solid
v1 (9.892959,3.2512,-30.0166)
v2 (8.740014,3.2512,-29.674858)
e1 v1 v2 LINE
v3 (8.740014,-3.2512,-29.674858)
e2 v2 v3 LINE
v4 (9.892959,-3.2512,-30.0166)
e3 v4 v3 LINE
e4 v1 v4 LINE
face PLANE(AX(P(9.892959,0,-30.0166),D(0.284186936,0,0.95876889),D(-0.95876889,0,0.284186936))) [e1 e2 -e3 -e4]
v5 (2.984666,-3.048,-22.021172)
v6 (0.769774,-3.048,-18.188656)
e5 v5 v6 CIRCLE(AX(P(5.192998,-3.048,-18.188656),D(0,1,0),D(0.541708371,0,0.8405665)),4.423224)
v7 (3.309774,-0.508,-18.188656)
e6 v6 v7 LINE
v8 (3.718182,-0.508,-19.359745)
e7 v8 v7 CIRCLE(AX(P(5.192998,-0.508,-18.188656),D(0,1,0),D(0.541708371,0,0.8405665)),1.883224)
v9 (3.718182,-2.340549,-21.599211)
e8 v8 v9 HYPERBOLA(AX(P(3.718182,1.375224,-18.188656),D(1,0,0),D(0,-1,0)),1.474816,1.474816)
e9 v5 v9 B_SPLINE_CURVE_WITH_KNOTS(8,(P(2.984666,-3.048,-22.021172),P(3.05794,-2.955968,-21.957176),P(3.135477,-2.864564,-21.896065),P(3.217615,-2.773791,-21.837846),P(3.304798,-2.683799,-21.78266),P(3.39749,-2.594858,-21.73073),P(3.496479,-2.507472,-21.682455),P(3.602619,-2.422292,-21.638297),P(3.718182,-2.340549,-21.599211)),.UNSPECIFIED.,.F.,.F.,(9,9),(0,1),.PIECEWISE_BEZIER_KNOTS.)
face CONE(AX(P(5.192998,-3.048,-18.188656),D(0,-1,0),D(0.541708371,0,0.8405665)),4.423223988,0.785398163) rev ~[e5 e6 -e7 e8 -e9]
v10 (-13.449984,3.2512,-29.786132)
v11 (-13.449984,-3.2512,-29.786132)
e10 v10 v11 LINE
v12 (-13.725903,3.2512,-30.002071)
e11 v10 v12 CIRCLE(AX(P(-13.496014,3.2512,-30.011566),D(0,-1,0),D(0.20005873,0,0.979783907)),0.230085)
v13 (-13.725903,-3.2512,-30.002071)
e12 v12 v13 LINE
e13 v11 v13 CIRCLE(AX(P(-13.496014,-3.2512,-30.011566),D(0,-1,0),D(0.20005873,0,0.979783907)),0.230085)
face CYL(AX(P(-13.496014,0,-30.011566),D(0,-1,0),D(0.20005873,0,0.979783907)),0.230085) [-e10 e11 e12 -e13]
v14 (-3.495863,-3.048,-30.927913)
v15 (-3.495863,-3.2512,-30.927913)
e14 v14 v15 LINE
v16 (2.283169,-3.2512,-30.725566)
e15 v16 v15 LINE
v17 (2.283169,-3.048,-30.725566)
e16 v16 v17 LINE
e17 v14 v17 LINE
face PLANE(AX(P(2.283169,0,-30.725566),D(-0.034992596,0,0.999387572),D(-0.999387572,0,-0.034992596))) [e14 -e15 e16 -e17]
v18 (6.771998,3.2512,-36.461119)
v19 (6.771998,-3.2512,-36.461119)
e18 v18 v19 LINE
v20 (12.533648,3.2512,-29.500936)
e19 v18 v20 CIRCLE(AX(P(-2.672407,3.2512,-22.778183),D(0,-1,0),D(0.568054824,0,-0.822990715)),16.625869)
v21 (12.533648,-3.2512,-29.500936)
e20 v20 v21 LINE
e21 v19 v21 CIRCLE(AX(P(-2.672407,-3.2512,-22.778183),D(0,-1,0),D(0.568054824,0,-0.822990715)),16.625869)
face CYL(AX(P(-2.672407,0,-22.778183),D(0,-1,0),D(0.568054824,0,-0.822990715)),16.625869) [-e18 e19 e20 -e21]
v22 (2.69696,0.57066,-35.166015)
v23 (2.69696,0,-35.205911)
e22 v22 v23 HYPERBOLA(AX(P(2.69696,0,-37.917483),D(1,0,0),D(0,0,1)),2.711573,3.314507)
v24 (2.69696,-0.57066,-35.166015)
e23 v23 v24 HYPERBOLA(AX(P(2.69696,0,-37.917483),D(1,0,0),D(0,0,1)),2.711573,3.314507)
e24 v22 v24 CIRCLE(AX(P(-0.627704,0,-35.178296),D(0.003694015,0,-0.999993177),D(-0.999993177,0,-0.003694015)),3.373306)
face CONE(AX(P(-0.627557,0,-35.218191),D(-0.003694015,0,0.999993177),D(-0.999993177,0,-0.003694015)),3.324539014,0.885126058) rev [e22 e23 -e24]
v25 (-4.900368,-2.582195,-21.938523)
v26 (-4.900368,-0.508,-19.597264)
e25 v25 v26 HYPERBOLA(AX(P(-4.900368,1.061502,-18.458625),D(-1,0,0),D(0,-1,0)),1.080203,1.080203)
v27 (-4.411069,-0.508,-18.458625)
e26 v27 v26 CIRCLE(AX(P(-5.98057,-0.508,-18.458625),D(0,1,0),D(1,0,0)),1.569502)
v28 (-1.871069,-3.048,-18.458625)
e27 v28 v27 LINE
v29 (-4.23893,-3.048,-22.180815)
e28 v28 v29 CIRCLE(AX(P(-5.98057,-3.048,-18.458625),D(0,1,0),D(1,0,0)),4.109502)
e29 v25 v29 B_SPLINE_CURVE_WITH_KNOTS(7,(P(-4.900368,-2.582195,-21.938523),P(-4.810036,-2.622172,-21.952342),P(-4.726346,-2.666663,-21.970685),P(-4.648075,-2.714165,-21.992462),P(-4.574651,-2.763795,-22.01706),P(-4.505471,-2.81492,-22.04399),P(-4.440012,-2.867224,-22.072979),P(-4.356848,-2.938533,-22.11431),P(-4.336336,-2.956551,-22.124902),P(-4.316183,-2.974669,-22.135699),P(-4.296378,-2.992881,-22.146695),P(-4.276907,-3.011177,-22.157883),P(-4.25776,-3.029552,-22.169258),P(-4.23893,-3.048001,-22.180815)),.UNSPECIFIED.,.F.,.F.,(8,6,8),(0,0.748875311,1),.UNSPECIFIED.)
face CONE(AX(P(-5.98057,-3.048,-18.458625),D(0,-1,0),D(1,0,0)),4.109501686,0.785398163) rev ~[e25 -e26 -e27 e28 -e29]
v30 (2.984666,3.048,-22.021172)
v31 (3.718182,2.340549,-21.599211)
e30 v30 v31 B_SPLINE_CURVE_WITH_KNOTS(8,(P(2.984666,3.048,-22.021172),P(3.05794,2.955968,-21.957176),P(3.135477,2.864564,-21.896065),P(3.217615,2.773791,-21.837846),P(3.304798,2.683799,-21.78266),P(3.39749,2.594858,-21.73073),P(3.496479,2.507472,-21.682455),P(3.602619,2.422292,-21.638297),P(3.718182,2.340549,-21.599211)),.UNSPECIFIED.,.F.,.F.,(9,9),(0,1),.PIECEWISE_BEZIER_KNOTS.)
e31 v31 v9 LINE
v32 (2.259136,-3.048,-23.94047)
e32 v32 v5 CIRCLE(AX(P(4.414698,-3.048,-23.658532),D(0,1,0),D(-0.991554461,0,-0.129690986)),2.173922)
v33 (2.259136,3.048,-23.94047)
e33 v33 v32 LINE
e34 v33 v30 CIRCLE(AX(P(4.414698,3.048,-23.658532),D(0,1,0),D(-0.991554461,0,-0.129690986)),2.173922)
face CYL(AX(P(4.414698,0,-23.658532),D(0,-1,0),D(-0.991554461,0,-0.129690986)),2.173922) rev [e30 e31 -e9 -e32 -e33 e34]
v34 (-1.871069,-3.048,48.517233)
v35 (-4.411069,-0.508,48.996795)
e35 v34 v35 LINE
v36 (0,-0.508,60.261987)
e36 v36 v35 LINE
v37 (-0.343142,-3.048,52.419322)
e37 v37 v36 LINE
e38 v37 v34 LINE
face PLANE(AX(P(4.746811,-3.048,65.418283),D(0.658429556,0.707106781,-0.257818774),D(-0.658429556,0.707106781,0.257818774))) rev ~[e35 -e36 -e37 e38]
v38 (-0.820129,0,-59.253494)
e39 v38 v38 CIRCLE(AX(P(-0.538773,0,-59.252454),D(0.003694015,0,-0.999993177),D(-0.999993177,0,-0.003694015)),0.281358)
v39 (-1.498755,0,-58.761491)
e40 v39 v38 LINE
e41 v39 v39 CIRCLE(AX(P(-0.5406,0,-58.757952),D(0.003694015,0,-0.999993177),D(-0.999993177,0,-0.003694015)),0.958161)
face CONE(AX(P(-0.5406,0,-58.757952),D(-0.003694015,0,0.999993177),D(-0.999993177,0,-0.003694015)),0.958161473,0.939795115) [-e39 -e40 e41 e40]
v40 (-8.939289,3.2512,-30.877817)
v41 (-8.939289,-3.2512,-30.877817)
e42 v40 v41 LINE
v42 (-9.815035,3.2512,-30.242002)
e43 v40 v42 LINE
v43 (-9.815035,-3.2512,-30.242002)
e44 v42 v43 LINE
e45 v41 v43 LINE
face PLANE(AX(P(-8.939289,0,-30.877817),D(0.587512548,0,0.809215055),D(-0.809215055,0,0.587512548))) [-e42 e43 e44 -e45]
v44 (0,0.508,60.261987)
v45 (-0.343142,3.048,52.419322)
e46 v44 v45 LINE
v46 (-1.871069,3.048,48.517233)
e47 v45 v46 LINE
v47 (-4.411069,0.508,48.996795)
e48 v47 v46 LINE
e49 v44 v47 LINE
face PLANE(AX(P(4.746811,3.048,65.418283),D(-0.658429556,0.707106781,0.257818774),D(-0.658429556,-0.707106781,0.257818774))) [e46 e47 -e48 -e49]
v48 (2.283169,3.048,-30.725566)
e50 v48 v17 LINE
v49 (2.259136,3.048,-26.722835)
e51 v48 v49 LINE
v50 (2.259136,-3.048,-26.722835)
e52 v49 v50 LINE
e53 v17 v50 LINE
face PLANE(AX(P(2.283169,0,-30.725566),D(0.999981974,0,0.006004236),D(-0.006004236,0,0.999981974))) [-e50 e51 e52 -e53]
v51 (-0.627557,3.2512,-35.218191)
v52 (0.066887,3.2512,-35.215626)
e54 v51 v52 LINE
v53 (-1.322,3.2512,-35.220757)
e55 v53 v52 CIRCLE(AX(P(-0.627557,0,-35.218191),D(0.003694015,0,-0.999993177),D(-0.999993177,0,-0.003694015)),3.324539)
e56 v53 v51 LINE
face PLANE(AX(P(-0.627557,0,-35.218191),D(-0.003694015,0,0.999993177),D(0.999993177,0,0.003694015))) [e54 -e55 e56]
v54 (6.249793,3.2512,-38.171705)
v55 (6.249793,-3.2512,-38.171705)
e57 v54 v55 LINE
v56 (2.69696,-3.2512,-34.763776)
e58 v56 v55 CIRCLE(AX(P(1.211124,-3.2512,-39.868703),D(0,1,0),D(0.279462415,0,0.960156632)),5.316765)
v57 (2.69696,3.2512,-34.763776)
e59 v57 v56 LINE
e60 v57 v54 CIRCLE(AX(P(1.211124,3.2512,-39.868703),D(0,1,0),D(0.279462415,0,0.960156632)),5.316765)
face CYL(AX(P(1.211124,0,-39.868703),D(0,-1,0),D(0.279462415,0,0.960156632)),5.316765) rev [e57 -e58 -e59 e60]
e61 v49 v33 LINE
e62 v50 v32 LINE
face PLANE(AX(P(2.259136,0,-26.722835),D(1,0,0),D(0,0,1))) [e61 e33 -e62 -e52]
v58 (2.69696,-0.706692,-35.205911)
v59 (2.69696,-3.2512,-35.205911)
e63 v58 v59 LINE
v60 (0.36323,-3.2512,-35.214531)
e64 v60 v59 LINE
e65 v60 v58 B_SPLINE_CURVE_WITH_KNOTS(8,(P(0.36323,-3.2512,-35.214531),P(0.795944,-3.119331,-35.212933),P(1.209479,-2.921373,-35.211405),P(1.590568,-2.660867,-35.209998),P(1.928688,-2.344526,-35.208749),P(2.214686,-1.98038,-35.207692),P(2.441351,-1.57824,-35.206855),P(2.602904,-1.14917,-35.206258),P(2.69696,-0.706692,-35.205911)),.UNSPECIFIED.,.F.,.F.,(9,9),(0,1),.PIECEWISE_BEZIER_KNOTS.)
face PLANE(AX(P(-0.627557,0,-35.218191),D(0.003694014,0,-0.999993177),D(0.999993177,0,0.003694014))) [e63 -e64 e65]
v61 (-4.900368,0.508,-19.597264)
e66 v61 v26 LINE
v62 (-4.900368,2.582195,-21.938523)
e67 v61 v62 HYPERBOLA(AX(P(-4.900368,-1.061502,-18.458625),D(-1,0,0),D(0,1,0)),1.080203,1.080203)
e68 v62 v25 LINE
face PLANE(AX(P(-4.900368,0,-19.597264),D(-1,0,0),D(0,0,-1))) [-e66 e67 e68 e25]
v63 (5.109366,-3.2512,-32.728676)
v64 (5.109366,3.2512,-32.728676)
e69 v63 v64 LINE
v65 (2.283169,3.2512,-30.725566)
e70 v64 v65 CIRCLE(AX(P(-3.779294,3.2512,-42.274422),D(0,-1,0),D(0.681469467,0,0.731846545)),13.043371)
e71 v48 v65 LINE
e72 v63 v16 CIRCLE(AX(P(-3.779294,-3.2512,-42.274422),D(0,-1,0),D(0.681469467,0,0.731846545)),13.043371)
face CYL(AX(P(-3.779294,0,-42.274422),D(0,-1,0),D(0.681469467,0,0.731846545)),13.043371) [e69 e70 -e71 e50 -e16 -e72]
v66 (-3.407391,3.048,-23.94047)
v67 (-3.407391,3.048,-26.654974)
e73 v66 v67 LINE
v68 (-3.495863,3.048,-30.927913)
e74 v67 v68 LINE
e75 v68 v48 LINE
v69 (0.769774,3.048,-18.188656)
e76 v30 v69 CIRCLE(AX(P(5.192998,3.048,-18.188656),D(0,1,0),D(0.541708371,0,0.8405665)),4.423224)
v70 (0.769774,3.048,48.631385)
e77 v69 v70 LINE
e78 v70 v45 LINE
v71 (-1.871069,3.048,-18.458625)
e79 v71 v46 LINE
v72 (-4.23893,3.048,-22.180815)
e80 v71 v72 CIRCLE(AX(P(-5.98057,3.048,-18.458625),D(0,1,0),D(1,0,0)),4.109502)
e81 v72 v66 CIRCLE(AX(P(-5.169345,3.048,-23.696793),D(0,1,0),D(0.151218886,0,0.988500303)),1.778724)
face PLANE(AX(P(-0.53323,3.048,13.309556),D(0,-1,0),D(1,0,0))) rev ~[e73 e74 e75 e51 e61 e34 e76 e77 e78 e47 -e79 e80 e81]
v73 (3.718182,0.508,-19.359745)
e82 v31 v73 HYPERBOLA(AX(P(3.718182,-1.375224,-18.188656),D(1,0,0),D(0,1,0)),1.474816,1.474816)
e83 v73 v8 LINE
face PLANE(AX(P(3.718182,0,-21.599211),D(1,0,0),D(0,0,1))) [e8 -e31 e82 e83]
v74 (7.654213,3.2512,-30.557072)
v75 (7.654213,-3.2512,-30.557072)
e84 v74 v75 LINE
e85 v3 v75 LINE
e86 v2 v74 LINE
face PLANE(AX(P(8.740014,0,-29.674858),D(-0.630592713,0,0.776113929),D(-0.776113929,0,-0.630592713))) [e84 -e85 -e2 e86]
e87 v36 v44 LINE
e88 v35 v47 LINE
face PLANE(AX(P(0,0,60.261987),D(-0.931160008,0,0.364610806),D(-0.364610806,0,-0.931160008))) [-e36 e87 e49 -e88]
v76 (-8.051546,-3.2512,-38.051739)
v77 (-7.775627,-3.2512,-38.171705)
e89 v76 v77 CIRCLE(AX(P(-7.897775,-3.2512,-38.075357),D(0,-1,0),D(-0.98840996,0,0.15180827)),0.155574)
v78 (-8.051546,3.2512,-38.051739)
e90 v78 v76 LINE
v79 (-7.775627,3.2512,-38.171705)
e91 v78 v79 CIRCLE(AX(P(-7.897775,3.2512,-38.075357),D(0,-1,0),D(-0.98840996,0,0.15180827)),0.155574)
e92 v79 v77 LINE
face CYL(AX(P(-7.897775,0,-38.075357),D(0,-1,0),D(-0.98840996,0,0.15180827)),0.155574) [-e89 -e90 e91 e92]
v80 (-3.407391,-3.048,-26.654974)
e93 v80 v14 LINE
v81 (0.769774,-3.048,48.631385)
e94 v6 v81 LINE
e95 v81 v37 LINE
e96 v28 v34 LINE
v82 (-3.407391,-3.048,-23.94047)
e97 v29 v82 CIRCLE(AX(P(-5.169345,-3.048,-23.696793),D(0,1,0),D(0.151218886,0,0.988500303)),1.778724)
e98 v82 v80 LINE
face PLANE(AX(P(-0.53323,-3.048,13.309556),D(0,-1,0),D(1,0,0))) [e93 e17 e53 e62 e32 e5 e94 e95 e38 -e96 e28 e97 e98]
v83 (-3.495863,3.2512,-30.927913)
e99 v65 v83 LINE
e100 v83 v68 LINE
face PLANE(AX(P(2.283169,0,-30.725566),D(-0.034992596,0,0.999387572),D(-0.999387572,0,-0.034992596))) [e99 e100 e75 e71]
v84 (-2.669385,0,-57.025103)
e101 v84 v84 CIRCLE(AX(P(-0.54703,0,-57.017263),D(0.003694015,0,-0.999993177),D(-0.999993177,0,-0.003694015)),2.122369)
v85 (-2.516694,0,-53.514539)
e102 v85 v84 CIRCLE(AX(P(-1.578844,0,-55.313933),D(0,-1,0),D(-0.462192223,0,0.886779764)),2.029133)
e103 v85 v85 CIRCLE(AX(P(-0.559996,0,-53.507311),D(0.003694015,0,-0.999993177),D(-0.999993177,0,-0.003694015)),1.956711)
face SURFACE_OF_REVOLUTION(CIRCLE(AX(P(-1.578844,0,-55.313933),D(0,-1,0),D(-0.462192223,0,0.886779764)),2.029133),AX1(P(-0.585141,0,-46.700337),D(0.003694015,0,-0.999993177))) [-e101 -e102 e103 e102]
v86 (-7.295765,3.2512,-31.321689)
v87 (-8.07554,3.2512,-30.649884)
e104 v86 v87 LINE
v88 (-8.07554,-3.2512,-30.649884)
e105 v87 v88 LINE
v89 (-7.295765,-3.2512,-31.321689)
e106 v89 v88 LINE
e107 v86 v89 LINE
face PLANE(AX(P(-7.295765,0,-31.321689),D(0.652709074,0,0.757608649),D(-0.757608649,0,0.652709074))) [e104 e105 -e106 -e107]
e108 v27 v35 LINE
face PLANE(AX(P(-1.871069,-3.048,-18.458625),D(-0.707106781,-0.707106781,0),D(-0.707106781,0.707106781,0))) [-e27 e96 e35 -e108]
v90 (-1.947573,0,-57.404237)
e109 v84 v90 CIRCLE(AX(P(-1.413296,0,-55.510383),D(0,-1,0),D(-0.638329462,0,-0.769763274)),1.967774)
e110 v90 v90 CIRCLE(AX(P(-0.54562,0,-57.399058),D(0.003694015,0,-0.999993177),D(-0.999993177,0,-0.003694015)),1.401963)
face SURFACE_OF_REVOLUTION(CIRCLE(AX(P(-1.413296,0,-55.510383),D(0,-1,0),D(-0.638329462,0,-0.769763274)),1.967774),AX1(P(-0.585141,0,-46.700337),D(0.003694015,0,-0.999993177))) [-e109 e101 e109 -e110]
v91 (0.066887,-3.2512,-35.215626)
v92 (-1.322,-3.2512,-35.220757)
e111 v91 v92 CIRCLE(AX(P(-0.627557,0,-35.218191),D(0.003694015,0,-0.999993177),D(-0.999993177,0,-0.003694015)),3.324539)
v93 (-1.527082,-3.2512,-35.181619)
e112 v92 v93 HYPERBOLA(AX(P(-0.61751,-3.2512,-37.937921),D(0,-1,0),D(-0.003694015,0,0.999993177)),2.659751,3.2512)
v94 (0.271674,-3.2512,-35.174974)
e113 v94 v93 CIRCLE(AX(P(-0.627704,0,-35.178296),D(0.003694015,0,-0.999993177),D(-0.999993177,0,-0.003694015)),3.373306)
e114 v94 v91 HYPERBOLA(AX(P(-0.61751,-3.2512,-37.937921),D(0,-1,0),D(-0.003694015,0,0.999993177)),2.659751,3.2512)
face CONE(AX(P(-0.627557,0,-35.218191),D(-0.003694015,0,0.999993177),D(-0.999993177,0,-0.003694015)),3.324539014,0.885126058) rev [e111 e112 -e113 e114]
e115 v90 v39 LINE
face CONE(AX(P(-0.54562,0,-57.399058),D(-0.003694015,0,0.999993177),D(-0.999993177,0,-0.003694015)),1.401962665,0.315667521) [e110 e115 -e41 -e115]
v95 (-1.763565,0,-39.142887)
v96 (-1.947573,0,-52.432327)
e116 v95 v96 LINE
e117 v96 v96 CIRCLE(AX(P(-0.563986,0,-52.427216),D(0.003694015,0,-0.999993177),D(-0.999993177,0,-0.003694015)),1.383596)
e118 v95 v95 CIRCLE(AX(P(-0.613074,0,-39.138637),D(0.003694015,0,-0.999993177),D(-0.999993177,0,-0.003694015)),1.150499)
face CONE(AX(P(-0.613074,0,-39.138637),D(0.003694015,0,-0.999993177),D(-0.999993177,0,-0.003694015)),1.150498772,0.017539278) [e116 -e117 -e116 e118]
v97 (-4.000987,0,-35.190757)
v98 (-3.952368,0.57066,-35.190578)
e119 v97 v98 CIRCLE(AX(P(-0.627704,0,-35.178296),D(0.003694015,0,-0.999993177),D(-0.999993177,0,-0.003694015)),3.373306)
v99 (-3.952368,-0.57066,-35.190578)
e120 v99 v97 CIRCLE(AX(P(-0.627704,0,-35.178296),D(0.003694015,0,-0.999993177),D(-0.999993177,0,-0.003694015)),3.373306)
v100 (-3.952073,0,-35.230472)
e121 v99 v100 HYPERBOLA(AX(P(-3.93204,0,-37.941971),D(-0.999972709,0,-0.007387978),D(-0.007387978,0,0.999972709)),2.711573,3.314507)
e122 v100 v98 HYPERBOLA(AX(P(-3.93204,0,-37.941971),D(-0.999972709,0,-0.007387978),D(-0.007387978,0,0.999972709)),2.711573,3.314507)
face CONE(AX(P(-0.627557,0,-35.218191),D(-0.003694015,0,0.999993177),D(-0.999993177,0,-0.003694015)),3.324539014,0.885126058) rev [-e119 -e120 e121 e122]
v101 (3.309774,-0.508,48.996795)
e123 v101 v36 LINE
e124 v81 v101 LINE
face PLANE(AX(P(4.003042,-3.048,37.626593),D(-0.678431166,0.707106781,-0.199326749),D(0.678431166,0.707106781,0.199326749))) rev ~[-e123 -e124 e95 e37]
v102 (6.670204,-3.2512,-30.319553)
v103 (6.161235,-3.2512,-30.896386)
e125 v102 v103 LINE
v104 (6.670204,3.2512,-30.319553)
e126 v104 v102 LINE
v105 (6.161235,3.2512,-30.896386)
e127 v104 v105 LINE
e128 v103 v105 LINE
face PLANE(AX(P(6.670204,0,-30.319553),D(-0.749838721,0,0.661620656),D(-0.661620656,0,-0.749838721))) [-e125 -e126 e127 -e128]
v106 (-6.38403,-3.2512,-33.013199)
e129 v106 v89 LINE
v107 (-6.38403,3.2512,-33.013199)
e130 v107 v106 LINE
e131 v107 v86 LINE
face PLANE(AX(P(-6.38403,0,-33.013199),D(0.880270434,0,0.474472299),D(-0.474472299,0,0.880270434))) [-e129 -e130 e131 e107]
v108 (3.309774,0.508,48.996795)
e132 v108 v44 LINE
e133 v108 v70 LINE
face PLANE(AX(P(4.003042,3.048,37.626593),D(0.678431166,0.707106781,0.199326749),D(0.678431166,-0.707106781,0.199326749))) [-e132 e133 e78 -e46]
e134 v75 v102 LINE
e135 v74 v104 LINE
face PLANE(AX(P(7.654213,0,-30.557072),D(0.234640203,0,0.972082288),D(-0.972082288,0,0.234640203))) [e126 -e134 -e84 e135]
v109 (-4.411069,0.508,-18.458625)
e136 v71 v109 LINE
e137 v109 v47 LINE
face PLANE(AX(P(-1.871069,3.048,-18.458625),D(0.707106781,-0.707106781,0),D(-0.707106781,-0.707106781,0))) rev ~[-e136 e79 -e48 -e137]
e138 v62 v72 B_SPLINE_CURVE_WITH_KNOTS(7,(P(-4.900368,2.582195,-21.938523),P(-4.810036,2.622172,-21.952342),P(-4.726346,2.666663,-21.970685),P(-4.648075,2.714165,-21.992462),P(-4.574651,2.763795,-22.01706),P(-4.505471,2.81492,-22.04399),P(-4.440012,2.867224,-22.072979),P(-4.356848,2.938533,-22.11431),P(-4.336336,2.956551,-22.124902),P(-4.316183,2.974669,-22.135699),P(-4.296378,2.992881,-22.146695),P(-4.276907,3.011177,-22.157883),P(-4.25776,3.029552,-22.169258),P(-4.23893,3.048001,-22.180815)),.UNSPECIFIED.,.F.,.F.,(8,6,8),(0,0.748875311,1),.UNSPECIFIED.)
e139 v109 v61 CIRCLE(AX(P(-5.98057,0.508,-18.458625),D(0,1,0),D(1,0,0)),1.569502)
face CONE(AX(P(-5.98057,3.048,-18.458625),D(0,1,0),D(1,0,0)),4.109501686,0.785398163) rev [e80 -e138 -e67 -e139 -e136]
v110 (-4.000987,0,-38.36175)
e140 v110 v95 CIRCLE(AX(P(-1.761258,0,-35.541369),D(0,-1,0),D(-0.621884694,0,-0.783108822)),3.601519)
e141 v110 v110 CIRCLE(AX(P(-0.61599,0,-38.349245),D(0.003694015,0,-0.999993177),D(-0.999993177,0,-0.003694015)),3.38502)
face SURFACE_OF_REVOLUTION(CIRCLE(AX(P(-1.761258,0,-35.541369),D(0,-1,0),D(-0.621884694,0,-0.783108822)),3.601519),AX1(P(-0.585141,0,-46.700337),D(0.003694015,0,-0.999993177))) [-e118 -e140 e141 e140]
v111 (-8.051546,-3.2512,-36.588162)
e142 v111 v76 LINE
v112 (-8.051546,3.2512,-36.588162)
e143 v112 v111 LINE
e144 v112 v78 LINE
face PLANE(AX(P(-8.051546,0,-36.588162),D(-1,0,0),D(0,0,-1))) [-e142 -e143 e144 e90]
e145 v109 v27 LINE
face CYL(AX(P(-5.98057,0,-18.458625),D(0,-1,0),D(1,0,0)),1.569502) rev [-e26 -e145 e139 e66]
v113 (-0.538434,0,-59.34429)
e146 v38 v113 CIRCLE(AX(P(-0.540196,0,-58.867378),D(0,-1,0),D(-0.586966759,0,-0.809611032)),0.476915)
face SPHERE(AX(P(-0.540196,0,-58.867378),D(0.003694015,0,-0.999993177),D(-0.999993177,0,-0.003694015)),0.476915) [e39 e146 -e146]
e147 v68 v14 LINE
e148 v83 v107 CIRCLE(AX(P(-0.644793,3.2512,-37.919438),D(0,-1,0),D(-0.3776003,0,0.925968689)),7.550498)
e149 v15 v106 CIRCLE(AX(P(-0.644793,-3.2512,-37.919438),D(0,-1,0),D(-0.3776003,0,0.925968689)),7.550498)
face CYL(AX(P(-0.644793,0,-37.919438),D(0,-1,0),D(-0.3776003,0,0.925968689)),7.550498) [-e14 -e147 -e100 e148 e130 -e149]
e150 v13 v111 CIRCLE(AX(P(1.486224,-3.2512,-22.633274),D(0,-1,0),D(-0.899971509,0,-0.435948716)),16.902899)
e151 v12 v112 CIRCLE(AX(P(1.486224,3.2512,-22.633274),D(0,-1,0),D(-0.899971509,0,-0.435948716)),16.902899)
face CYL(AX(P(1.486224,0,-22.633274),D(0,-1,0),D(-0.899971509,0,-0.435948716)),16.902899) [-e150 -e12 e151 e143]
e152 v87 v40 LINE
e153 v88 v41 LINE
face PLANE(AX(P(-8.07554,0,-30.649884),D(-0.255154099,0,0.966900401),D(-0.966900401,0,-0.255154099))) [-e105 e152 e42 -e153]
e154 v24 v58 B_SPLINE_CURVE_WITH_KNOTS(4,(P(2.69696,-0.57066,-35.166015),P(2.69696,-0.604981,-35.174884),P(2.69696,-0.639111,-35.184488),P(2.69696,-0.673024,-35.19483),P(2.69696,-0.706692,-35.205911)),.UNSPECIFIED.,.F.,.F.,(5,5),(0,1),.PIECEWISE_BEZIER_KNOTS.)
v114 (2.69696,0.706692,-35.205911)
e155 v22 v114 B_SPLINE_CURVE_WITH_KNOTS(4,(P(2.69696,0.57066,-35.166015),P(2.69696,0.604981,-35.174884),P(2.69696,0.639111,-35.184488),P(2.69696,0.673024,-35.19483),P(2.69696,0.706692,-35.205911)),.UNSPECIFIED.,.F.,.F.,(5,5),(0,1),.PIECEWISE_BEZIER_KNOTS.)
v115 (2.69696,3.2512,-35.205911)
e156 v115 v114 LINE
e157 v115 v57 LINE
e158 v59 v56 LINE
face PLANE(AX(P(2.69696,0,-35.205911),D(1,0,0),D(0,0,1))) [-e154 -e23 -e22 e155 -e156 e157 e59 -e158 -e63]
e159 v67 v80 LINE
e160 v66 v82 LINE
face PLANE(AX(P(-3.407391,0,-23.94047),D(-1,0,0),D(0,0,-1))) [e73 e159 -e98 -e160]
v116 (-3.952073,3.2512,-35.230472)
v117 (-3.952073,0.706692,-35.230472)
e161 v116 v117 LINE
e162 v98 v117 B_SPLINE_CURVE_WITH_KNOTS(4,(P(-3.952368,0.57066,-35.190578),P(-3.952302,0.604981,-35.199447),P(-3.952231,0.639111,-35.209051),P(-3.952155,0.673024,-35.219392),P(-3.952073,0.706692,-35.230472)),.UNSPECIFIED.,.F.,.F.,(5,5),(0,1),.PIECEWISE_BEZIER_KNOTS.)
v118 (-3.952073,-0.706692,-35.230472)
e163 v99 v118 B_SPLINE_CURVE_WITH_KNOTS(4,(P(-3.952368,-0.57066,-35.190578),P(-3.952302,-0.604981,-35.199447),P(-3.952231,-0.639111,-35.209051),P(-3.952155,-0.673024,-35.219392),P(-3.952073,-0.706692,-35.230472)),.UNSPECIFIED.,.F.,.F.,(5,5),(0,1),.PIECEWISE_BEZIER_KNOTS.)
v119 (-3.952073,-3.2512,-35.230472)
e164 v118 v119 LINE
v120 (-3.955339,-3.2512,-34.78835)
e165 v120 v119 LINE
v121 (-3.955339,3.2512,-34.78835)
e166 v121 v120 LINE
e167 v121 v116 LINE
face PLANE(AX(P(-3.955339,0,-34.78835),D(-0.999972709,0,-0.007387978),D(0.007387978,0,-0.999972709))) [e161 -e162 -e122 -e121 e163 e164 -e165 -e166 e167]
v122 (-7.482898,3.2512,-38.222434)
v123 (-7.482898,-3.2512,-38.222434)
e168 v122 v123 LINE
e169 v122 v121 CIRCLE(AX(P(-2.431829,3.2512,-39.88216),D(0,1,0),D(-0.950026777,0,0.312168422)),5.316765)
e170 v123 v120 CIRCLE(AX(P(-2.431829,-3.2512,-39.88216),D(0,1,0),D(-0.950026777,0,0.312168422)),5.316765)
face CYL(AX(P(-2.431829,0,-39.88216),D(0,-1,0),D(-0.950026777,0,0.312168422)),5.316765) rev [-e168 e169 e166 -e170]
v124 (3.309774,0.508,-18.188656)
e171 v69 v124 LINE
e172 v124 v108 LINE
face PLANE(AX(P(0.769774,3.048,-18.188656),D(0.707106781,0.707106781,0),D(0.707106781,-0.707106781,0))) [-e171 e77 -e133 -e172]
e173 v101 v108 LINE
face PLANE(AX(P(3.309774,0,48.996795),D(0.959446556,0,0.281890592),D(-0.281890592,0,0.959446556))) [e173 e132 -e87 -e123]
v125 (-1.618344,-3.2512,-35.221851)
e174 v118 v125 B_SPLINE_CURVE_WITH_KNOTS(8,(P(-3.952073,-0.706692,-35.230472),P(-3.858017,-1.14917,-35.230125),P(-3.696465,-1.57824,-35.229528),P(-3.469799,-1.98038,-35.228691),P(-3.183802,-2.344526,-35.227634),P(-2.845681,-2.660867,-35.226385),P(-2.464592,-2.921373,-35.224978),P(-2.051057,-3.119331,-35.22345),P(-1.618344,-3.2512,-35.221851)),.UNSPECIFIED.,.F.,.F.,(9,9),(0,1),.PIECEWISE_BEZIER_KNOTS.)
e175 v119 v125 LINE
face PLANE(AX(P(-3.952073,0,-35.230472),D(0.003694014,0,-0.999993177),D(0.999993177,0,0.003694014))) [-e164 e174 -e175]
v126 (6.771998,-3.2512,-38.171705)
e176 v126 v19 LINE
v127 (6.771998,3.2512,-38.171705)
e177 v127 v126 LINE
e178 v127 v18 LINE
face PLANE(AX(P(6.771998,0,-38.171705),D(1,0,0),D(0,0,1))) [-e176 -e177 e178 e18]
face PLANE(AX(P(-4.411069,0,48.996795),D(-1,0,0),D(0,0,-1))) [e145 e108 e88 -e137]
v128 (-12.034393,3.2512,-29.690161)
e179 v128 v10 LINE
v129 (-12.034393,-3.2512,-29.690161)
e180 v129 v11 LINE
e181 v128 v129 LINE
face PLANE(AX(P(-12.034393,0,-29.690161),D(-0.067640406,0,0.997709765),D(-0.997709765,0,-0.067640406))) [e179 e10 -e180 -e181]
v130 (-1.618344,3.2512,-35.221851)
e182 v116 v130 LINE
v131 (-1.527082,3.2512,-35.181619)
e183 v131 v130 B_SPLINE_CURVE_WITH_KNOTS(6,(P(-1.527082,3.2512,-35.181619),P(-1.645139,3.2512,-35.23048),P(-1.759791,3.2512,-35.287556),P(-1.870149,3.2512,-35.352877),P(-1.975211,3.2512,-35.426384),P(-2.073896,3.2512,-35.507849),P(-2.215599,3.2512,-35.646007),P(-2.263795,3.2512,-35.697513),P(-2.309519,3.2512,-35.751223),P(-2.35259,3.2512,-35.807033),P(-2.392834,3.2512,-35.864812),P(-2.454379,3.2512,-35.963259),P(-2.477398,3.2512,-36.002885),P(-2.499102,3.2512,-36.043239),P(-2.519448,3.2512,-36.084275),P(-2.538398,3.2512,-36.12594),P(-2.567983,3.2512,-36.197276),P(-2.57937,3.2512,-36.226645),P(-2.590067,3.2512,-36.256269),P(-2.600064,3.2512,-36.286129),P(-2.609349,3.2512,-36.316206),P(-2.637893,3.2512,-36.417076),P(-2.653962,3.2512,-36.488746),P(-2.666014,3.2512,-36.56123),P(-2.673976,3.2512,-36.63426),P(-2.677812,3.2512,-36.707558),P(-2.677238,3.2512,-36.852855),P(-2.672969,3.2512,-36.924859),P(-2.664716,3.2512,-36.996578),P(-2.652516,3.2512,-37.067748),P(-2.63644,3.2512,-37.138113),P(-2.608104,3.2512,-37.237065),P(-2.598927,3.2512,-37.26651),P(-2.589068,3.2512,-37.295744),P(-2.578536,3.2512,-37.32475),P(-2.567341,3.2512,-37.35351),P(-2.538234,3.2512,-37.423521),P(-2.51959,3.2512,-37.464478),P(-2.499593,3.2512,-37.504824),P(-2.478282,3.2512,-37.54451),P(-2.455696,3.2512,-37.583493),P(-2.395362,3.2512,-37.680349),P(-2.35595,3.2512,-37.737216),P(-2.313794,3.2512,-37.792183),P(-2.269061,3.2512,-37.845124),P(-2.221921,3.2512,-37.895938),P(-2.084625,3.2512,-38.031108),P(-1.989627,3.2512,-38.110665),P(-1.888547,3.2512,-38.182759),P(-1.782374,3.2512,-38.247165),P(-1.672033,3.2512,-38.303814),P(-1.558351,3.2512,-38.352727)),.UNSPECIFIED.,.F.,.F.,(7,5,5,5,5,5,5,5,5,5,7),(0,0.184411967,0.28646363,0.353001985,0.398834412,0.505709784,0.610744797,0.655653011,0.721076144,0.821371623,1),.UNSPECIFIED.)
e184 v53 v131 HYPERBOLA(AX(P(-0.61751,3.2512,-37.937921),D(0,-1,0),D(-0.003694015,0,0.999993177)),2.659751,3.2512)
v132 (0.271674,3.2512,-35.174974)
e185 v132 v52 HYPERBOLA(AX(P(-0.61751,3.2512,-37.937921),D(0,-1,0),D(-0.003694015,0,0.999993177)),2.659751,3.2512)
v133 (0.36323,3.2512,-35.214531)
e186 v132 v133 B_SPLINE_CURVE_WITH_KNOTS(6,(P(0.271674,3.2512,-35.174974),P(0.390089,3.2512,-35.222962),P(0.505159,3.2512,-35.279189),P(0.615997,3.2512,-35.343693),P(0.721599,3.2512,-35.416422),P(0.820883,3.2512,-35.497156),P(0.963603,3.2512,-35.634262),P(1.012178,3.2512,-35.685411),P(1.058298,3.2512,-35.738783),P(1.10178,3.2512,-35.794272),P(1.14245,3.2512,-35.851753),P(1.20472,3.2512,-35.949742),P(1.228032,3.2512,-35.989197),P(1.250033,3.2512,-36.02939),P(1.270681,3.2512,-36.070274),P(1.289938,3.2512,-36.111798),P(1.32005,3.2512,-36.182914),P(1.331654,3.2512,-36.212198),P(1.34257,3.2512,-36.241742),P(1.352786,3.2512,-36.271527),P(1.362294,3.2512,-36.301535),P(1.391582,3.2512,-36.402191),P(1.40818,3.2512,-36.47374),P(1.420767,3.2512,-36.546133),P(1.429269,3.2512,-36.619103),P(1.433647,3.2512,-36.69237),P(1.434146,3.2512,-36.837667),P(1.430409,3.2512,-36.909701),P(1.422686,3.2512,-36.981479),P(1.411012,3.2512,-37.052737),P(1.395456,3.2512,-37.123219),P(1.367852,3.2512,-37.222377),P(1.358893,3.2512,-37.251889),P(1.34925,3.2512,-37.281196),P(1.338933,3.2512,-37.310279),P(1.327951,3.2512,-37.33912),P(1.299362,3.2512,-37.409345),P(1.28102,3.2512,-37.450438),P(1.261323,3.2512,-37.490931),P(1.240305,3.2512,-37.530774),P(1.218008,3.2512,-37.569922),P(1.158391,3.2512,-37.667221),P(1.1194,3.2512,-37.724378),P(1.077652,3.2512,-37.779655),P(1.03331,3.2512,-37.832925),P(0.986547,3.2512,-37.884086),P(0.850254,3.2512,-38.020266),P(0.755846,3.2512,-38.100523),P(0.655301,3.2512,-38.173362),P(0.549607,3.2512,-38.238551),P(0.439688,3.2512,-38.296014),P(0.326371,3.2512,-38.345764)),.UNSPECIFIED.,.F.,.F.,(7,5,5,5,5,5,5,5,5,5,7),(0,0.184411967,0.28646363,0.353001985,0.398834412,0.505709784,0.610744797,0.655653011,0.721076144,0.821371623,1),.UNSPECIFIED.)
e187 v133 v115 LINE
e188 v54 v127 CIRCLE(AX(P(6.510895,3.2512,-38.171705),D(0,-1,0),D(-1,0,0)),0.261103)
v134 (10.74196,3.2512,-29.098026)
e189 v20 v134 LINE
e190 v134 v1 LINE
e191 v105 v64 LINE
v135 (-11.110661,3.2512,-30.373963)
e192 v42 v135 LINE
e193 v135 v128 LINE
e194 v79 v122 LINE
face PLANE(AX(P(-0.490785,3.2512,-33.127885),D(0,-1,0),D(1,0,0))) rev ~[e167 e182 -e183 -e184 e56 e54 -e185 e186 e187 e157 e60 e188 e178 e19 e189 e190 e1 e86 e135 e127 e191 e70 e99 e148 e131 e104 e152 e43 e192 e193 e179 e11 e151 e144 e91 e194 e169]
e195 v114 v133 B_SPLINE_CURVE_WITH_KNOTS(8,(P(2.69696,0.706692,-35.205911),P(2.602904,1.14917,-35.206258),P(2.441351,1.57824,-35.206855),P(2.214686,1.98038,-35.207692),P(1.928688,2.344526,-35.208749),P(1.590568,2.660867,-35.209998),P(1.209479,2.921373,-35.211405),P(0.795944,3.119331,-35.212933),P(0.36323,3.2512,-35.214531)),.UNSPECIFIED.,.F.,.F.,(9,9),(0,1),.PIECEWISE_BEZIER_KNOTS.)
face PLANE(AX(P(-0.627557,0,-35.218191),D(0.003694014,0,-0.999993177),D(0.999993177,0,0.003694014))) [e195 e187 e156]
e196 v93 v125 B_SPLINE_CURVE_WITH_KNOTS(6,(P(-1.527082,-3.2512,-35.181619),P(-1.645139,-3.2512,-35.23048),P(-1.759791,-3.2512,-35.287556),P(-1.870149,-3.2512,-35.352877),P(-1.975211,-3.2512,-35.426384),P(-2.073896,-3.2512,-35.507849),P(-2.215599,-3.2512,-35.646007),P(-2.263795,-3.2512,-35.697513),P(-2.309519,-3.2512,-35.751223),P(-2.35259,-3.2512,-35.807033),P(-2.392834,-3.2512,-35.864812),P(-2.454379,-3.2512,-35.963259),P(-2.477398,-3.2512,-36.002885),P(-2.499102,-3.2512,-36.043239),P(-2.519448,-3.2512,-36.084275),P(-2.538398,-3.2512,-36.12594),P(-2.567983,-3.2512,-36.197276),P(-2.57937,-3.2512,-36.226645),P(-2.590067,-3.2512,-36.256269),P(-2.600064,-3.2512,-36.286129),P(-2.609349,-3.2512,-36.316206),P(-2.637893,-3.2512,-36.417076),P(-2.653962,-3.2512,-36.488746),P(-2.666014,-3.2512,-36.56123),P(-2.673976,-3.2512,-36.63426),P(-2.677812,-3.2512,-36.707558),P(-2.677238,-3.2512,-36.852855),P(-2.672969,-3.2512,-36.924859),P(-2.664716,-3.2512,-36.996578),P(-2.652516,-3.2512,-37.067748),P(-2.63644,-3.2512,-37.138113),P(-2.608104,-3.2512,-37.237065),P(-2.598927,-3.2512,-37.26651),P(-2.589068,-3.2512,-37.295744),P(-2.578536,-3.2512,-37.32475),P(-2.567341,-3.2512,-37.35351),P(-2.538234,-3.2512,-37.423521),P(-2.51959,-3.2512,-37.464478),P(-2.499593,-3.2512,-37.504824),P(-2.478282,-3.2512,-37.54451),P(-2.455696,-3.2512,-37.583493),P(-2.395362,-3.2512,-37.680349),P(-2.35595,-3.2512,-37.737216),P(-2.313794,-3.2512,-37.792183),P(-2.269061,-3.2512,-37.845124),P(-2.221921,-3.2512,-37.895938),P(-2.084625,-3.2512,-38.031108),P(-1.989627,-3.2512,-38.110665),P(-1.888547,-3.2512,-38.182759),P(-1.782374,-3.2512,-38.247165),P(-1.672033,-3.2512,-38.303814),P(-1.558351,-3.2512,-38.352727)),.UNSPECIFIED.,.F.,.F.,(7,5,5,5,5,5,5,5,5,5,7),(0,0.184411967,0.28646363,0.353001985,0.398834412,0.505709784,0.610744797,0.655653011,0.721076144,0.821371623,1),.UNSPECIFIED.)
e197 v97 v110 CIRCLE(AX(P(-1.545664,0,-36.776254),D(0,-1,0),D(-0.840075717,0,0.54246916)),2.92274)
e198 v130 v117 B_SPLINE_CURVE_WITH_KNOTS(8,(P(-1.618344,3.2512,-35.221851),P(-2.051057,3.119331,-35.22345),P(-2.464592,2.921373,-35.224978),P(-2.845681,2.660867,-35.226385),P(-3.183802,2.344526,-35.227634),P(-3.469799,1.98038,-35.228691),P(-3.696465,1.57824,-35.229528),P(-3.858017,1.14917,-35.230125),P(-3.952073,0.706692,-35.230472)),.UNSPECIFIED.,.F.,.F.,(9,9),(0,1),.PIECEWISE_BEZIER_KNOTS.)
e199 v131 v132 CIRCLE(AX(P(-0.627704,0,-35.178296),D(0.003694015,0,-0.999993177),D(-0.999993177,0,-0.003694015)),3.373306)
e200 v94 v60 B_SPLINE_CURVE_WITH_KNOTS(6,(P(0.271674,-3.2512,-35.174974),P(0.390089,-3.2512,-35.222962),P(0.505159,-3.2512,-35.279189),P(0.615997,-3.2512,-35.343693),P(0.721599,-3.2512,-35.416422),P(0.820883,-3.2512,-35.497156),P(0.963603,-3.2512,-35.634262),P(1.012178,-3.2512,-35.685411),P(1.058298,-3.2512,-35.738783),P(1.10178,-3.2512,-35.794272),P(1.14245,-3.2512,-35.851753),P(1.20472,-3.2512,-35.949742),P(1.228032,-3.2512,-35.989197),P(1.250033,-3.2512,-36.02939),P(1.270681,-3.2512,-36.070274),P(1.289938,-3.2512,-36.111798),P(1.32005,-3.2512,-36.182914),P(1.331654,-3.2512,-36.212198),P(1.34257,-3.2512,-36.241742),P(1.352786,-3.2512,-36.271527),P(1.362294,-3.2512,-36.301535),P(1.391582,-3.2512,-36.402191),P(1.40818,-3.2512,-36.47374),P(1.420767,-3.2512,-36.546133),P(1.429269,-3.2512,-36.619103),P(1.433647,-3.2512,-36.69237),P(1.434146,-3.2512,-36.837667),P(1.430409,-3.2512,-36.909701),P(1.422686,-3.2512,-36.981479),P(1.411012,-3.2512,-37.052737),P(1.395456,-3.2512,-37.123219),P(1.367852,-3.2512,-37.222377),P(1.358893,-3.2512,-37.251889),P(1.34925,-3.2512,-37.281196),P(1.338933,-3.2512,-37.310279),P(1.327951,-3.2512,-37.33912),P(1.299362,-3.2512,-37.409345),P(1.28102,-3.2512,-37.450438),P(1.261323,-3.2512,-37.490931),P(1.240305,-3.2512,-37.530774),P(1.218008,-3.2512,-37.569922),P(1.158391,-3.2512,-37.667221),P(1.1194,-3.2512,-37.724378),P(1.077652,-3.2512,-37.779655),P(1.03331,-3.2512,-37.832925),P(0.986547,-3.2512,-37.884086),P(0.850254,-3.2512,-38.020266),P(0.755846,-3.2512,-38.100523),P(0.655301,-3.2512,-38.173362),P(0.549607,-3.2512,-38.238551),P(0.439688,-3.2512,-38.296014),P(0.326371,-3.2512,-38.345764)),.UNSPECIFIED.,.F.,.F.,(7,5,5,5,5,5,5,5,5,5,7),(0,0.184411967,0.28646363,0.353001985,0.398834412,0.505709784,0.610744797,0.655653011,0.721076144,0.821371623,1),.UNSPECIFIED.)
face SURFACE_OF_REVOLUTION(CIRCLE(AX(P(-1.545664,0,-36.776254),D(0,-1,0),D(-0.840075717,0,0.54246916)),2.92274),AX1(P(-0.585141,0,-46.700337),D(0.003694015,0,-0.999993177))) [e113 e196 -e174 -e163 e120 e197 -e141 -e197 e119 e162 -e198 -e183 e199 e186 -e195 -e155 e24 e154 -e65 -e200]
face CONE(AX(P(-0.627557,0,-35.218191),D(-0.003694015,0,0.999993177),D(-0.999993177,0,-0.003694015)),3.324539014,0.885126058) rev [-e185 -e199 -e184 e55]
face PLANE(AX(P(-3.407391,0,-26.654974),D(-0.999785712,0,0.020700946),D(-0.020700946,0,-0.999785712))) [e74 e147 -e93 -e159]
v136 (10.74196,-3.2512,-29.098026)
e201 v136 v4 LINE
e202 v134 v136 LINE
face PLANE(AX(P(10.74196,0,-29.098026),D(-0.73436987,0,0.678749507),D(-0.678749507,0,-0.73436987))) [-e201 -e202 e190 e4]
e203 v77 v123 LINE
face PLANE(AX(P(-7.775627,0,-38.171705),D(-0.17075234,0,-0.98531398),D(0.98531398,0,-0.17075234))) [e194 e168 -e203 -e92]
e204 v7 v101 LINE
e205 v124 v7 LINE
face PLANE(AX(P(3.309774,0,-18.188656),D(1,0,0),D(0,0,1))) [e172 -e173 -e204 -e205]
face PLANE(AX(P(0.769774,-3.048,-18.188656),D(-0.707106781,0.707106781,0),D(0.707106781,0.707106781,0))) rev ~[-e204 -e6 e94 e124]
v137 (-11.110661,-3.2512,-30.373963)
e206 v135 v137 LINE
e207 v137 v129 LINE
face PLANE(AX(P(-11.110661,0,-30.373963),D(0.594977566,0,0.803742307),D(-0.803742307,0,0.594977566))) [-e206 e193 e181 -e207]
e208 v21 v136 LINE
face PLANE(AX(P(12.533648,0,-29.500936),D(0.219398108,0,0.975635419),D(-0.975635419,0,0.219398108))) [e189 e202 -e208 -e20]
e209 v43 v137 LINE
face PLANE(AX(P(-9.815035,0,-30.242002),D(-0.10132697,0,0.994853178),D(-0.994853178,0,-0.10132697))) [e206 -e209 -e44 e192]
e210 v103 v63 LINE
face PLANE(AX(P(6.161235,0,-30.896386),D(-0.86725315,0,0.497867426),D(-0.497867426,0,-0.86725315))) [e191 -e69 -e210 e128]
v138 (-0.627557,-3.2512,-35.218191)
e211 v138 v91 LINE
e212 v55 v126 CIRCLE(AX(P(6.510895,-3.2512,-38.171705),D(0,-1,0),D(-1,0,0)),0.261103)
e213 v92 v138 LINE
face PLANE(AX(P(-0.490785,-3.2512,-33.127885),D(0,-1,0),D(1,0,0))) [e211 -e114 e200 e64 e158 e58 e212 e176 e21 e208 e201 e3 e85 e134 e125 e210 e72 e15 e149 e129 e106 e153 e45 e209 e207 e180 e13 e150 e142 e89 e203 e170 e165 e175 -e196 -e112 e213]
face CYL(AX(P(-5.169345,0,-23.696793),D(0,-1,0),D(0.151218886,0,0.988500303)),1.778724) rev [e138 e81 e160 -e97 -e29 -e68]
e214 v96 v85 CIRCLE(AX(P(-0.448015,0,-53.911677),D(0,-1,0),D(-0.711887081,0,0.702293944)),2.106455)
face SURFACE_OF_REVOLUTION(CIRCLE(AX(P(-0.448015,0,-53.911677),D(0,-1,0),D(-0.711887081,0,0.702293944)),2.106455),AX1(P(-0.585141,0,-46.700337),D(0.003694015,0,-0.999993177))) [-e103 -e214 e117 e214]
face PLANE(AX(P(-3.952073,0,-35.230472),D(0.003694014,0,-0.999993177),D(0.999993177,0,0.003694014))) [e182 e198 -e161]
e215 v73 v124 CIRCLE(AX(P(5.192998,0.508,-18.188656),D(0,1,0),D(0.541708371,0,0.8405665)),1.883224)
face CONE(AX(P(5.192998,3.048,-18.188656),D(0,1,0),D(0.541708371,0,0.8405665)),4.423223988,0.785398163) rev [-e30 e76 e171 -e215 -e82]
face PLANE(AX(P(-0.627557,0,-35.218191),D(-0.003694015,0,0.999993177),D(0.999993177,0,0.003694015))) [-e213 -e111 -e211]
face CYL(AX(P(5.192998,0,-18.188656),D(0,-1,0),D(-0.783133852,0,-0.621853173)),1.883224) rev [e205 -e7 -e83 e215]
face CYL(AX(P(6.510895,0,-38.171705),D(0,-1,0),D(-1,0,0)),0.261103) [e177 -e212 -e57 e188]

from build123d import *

# Parameters (mm, degrees)
F2_DEPTH     = 3.2512
F3_DEPTH     = 3.048
F4_T1_DEPTH  = 29.734621701
F4_T3_DEPTH  = 78.5599474126
F4_T5_DEPTH  = 29.3779460523
F4_T7_DEPTH  = 78.2899783824
F4_T10_ANGLE = 237.1999890444
F4_T12_ANGLE = 237.1999890444
F4_T14_ANGLE = 359.64
F4_T16_ANGLE = 359.64


# Not quite as in the source:
# - a fillet or chamfer that OpenCascade refuses, or shapes differently, is made with other operations: its cross-section is extruded or revolved along the edge and cut away or added


with BuildPart() as f1:
    # F0 (on Front) → F1 (revolve)
    with BuildSketch(Plane.XZ):
        with BuildLine():
            Line((-0.6275566491, -35.2181914225), (-3.9520729807, -35.2304723177))
            Line((-3.9520729807, -35.2304723177), (-4.0009869263, -35.190757364))
            ThreePointArc((-4.0009869263, -35.190757364), (-4.468403987, -36.7762535495), (-4.0009869263, -38.361749735))
            ThreePointArc((-4.0009869263, -38.361749735), (-2.9483659374, -38.9416202329), (-1.7635652912, -39.1428866466))
            Line((-1.7635652912, -39.1428866466), (-1.9475727458, -52.4323270698))
            Line((-1.9475727458, -52.4323270698), (-0.5639669494, -52.4323270698))
            Line((-0.5639669494, -52.4323270698), (-0.6275566491, -35.2181914225))
        make_face()
        with BuildLine():
            Line((-0.540195615, -58.8673782805), (-0.5639669494, -52.4323270698))
            Line((-0.5639669494, -52.4323270698), (-1.9475727458, -52.4323270698))
            ThreePointArc((-1.9475727458, -52.4323270698), (-2.3123844436, -52.9312298771), (-2.5166937266, -53.5145388027))
            ThreePointArc((-2.5166937266, -53.5145388027), (-3.6060607732, -55.2257600565), (-2.6693845284, -57.0251033684))
            ThreePointArc((-2.6693845284, -57.0251033684), (-2.3283302078, -57.2524646389), (-1.9475727458, -57.4042373379))
            Line((-1.9475727458, -57.4042373379), (-1.4987547765, -58.7614909788))
            Line((-1.4987547765, -58.7614909788), (-0.820128771, -59.2534937938))
            ThreePointArc((-0.820128771, -59.2534937938), (-0.6865028844, -59.3212967141), (-0.5384338847, -59.3442898632))
            Line((-0.5384338847, -59.3442898632), (-0.540195615, -58.8673782805))
        make_face()
    revolve(axis=Axis((-0.5851411479, 0, -46.7003370305), (0.0036940145, 0, -0.9999931771)))

    # F0 (on Front) → F2 (join, symmetric)
    with BuildSketch(Plane.XZ):
        with BuildLine():
            Line((2.2831694857, -30.7255659779), (-3.495863406, -30.9279132634))
            ThreePointArc((-3.495863406, -30.9279132634), (-5.0646851839, -31.7977900116), (-6.3840295188, -33.0131985247))
            Line((-6.3840295188, -33.0131985247), (-7.2957654484, -31.3216894865))
            Line((-7.2957654484, -31.3216894865), (-8.075539954, -30.6498836726))
            Line((-8.075539954, -30.6498836726), (-8.9392894879, -30.8778174222))
            Line((-8.9392894879, -30.8778174222), (-9.8150353879, -30.2420016378))
            Line((-9.8150353879, -30.2420016378), (-11.11066062, -30.3739625961))
            Line((-11.11066062, -30.3739625961), (-12.0343929157, -29.6901613474))
            Line((-12.0343929157, -29.6901613474), (-13.4499836713, -29.7861322761))
            ThreePointArc((-13.4499836713, -29.7861322761), (-13.6378178947, -29.8303732109), (-13.7259028852, -30.0020705909))
            ThreePointArc((-13.7259028852, -30.0020705909), (-11.3193803546, -33.6661550155), (-8.0515462905, -36.5881621838))
            Line((-8.0515462905, -36.5881621838), (-8.0515462905, -38.0517393351))
            ThreePointArc((-8.0515462905, -38.0517393351), (-7.9598069948, -38.2180289535), (-7.775626611, -38.1717048585))
            Line((-7.775626611, -38.1717048585), (-7.4828979958, -38.2224339632))
            ThreePointArc((-7.4828979958, -38.2224339632), (-6.1405359903, -36.0725037485), (-3.9553394628, -34.7883496227))
            Line((-3.9553394628, -34.7883496227), (-3.9520729807, -35.2304723177))
            Line((-3.9520729807, -35.2304723177), (-0.6275566491, -35.2181914225))
            Line((-0.6275566491, -35.2181914225), (2.6969596825, -35.2059105274))
            Line((2.6969596825, -35.2059105274), (2.6969596825, -34.7637757659))
            ThreePointArc((2.6969596825, -34.7637757659), (4.8915838758, -36.0317506602), (6.2497928845, -38.1717048585))
            ThreePointArc((6.2497928845, -38.1717048585), (6.5108954494, -38.4328074234), (6.7719980143, -38.1717048585))
            Line((6.7719980143, -38.1717048585), (6.7719980143, -36.4611186087))
            ThreePointArc((6.7719980143, -36.4611186087), (10.1347132538, -33.3799368553), (12.5336479489, -29.500936068))
            Line((12.5336479489, -29.500936068), (10.7419602573, -29.0980264544))
            Line((10.7419602573, -29.0980264544), (9.8929585313, -30.0165999209))
            Line((9.8929585313, -30.0165999209), (8.7400143966, -29.6748578548))
            Line((8.7400143966, -29.6748578548), (7.6542128809, -30.5570717901))
            Line((7.6542128809, -30.5570717901), (6.6702044569, -30.3195528686))
            Line((6.6702044569, -30.3195528686), (6.1612352729, -30.8963861316))
            Line((6.1612352729, -30.8963861316), (5.1093655638, -32.7286757529))
            ThreePointArc((5.1093655638, -32.7286757529), (3.7630618873, -31.6328804159), (2.2831694857, -30.7255659779))
        make_face()
    extrude(amount=F2_DEPTH, both=True)

    # F0 (on Front) → F3 (join, symmetric)
    with BuildSketch(Plane.XZ):
        with BuildLine():
            Line((-4.411068745, 48.9967949688), (-4.411068745, -18.4586253017))
            ThreePointArc((-4.411068745, -18.4586253017), (-4.5385726522, -19.078284844), (-4.9003679305, -19.5972640067))
            Line((-4.9003679305, -19.5972640067), (-4.9003679305, -21.9385232776))
            ThreePointArc((-4.9003679305, -21.9385232776), (-3.7434702801, -22.6334289507), (-3.4073905554, -23.9404700696))
            Line((-3.4073905554, -23.9404700696), (-3.4073905554, -26.6549736261))
            Line((-3.4073905554, -26.6549736261), (-3.495863406, -30.9279132634))
            Line((-3.495863406, -30.9279132634), (2.2831694857, -30.7255659779))
            Line((2.2831694857, -30.7255659779), (2.2591357119, -26.7228353769))
            Line((2.2591357119, -26.7228353769), (2.2591357119, -23.9404700696))
            ThreePointArc((2.2591357119, -23.9404700696), (2.5697152514, -22.5087595302), (3.7181819789, -21.5992107987))
            Line((3.7181819789, -21.5992107987), (3.7181819789, -19.3597450852))
            ThreePointArc((3.7181819789, -19.3597450852), (3.4148052065, -18.8087864436), (3.3097744472, -18.1886562715))
            Line((3.3097744472, -18.1886562715), (3.3097744472, 48.9967949688))
            Line((3.3097744472, 48.9967949688), (0, 60.2619871497))
            Line((0, 60.2619871497), (-4.411068745, 48.9967949688))
        make_face()
    extrude(amount=F3_DEPTH, both=True)

    # F4: chamfer of 2.54 on 8 edges, made by hand

    # F4_s2 → F4_t1 (cut)
    with BuildSketch(Plane(origin=(22.8412726569, 0, 58.3331027043), x_dir=(0, 1, 0), z_dir=(-0.3646108065, 0, -0.9311600076))):
        Polygon((3.048, -19.4321717346), (0.508, -21.9721717346), (3.048, -21.9721717346), align=None)
        Polygon((-3.048, -19.4321717346), (-0.508, -21.9721717346), (-3.048, -21.9721717346), align=None)
    extrude(amount=F4_T1_DEPTH, mode=Mode.SUBTRACT)

    # F4_s4 → F4_t3 (cut)
    with BuildSketch(Plane.XY.offset(-18.4586253017)):
        Polygon((-1.871068745, -3.048), (-4.411068745, -0.508), (-4.411068745, -3.048), align=None)
        Polygon((-1.871068745, 3.048), (-4.411068745, 0.508), (-4.411068745, 3.048), align=None)
    extrude(amount=F4_T3_DEPTH, mode=Mode.SUBTRACT)

    # F4_s6 → F4_t5 (cut)
    with BuildSketch(Plane(origin=(-9.8583580644, 0, 33.5540381846), x_dir=(0, 1, 0), z_dir=(-0.2818905922, 0, 0.9594465561))):
        Polygon((3.048, -14.4472872435), (0.508, -16.9872872435), (3.048, -16.9872872435), align=None)
        Polygon((-3.048, -14.4472872435), (-0.508, -16.9872872435), (-3.048, -16.9872872435), align=None)
    extrude(amount=F4_T5_DEPTH, mode=Mode.SUBTRACT)

    # F4_s8 → F4_t7 (cut)
    with BuildSketch(Plane.XY.offset(-18.1886562715)):
        Polygon((0.7697744472, 3.048), (3.3097744472, 0.508), (3.3097744472, 3.048), align=None)
        Polygon((0.7697744472, -3.048), (3.3097744472, -0.508), (3.3097744472, -3.048), align=None)
    extrude(amount=F4_T7_DEPTH, mode=Mode.SUBTRACT)

    # F4_s9 → F4_t10 (revolve, cut)
    with BuildSketch(Plane(origin=(11.9511811184, 0, -7.702013887), x_dir=(0, 1, 0), z_dir=(-0.8405664999, 0, 0.541708371))):
        Polygon((-3.048, 8.0524604286), (-0.508, 10.5924604286), (-3.048, 10.5924604286), align=None)
    revolve(axis=Axis((5.1929984357, -3.048, -18.1886562715), (0, 1, 0)), revolution_arc=F4_T10_ANGLE, mode=Mode.SUBTRACT)

    # F4_s11 → F4_t12 (revolve, cut)
    with BuildSketch(Plane(origin=(11.9511811184, 0, -7.702013887), x_dir=(0, 1, 0), z_dir=(-0.8405664999, 0, 0.541708371))):
        Polygon((3.048, 8.0524604286), (0.508, 10.5924604286), (3.048, 10.5924604286), align=None)
    revolve(axis=Axis((5.1929984357, 3.048, -18.1886562715), (0, 1, 0)), revolution_arc=F4_T12_ANGLE, mode=Mode.SUBTRACT)

    # F4_s13 → F4_t14 (revolve, cut)
    with BuildSketch(Plane.XY.offset(-18.4586253017)):
        Polygon((-1.871068745, 3.048), (-4.411068745, 0.508), (-4.411068745, 3.048), align=None)
    revolve(axis=Axis((-5.9805704311, 3.048, -18.4586253017), (0, 1, 0)), revolution_arc=F4_T14_ANGLE, mode=Mode.SUBTRACT)

    # F4_s15 → F4_t16 (revolve, cut)
    with BuildSketch(Plane.XY.offset(-18.4586253017)):
        Polygon((-1.871068745, -3.048), (-4.411068745, -0.508), (-4.411068745, -3.048), align=None)
    revolve(axis=Axis((-5.9805704311, -3.048, -18.4586253017), (0, 1, 0)), revolution_arc=F4_T16_ANGLE, mode=Mode.SUBTRACT)


solid = f1.part
